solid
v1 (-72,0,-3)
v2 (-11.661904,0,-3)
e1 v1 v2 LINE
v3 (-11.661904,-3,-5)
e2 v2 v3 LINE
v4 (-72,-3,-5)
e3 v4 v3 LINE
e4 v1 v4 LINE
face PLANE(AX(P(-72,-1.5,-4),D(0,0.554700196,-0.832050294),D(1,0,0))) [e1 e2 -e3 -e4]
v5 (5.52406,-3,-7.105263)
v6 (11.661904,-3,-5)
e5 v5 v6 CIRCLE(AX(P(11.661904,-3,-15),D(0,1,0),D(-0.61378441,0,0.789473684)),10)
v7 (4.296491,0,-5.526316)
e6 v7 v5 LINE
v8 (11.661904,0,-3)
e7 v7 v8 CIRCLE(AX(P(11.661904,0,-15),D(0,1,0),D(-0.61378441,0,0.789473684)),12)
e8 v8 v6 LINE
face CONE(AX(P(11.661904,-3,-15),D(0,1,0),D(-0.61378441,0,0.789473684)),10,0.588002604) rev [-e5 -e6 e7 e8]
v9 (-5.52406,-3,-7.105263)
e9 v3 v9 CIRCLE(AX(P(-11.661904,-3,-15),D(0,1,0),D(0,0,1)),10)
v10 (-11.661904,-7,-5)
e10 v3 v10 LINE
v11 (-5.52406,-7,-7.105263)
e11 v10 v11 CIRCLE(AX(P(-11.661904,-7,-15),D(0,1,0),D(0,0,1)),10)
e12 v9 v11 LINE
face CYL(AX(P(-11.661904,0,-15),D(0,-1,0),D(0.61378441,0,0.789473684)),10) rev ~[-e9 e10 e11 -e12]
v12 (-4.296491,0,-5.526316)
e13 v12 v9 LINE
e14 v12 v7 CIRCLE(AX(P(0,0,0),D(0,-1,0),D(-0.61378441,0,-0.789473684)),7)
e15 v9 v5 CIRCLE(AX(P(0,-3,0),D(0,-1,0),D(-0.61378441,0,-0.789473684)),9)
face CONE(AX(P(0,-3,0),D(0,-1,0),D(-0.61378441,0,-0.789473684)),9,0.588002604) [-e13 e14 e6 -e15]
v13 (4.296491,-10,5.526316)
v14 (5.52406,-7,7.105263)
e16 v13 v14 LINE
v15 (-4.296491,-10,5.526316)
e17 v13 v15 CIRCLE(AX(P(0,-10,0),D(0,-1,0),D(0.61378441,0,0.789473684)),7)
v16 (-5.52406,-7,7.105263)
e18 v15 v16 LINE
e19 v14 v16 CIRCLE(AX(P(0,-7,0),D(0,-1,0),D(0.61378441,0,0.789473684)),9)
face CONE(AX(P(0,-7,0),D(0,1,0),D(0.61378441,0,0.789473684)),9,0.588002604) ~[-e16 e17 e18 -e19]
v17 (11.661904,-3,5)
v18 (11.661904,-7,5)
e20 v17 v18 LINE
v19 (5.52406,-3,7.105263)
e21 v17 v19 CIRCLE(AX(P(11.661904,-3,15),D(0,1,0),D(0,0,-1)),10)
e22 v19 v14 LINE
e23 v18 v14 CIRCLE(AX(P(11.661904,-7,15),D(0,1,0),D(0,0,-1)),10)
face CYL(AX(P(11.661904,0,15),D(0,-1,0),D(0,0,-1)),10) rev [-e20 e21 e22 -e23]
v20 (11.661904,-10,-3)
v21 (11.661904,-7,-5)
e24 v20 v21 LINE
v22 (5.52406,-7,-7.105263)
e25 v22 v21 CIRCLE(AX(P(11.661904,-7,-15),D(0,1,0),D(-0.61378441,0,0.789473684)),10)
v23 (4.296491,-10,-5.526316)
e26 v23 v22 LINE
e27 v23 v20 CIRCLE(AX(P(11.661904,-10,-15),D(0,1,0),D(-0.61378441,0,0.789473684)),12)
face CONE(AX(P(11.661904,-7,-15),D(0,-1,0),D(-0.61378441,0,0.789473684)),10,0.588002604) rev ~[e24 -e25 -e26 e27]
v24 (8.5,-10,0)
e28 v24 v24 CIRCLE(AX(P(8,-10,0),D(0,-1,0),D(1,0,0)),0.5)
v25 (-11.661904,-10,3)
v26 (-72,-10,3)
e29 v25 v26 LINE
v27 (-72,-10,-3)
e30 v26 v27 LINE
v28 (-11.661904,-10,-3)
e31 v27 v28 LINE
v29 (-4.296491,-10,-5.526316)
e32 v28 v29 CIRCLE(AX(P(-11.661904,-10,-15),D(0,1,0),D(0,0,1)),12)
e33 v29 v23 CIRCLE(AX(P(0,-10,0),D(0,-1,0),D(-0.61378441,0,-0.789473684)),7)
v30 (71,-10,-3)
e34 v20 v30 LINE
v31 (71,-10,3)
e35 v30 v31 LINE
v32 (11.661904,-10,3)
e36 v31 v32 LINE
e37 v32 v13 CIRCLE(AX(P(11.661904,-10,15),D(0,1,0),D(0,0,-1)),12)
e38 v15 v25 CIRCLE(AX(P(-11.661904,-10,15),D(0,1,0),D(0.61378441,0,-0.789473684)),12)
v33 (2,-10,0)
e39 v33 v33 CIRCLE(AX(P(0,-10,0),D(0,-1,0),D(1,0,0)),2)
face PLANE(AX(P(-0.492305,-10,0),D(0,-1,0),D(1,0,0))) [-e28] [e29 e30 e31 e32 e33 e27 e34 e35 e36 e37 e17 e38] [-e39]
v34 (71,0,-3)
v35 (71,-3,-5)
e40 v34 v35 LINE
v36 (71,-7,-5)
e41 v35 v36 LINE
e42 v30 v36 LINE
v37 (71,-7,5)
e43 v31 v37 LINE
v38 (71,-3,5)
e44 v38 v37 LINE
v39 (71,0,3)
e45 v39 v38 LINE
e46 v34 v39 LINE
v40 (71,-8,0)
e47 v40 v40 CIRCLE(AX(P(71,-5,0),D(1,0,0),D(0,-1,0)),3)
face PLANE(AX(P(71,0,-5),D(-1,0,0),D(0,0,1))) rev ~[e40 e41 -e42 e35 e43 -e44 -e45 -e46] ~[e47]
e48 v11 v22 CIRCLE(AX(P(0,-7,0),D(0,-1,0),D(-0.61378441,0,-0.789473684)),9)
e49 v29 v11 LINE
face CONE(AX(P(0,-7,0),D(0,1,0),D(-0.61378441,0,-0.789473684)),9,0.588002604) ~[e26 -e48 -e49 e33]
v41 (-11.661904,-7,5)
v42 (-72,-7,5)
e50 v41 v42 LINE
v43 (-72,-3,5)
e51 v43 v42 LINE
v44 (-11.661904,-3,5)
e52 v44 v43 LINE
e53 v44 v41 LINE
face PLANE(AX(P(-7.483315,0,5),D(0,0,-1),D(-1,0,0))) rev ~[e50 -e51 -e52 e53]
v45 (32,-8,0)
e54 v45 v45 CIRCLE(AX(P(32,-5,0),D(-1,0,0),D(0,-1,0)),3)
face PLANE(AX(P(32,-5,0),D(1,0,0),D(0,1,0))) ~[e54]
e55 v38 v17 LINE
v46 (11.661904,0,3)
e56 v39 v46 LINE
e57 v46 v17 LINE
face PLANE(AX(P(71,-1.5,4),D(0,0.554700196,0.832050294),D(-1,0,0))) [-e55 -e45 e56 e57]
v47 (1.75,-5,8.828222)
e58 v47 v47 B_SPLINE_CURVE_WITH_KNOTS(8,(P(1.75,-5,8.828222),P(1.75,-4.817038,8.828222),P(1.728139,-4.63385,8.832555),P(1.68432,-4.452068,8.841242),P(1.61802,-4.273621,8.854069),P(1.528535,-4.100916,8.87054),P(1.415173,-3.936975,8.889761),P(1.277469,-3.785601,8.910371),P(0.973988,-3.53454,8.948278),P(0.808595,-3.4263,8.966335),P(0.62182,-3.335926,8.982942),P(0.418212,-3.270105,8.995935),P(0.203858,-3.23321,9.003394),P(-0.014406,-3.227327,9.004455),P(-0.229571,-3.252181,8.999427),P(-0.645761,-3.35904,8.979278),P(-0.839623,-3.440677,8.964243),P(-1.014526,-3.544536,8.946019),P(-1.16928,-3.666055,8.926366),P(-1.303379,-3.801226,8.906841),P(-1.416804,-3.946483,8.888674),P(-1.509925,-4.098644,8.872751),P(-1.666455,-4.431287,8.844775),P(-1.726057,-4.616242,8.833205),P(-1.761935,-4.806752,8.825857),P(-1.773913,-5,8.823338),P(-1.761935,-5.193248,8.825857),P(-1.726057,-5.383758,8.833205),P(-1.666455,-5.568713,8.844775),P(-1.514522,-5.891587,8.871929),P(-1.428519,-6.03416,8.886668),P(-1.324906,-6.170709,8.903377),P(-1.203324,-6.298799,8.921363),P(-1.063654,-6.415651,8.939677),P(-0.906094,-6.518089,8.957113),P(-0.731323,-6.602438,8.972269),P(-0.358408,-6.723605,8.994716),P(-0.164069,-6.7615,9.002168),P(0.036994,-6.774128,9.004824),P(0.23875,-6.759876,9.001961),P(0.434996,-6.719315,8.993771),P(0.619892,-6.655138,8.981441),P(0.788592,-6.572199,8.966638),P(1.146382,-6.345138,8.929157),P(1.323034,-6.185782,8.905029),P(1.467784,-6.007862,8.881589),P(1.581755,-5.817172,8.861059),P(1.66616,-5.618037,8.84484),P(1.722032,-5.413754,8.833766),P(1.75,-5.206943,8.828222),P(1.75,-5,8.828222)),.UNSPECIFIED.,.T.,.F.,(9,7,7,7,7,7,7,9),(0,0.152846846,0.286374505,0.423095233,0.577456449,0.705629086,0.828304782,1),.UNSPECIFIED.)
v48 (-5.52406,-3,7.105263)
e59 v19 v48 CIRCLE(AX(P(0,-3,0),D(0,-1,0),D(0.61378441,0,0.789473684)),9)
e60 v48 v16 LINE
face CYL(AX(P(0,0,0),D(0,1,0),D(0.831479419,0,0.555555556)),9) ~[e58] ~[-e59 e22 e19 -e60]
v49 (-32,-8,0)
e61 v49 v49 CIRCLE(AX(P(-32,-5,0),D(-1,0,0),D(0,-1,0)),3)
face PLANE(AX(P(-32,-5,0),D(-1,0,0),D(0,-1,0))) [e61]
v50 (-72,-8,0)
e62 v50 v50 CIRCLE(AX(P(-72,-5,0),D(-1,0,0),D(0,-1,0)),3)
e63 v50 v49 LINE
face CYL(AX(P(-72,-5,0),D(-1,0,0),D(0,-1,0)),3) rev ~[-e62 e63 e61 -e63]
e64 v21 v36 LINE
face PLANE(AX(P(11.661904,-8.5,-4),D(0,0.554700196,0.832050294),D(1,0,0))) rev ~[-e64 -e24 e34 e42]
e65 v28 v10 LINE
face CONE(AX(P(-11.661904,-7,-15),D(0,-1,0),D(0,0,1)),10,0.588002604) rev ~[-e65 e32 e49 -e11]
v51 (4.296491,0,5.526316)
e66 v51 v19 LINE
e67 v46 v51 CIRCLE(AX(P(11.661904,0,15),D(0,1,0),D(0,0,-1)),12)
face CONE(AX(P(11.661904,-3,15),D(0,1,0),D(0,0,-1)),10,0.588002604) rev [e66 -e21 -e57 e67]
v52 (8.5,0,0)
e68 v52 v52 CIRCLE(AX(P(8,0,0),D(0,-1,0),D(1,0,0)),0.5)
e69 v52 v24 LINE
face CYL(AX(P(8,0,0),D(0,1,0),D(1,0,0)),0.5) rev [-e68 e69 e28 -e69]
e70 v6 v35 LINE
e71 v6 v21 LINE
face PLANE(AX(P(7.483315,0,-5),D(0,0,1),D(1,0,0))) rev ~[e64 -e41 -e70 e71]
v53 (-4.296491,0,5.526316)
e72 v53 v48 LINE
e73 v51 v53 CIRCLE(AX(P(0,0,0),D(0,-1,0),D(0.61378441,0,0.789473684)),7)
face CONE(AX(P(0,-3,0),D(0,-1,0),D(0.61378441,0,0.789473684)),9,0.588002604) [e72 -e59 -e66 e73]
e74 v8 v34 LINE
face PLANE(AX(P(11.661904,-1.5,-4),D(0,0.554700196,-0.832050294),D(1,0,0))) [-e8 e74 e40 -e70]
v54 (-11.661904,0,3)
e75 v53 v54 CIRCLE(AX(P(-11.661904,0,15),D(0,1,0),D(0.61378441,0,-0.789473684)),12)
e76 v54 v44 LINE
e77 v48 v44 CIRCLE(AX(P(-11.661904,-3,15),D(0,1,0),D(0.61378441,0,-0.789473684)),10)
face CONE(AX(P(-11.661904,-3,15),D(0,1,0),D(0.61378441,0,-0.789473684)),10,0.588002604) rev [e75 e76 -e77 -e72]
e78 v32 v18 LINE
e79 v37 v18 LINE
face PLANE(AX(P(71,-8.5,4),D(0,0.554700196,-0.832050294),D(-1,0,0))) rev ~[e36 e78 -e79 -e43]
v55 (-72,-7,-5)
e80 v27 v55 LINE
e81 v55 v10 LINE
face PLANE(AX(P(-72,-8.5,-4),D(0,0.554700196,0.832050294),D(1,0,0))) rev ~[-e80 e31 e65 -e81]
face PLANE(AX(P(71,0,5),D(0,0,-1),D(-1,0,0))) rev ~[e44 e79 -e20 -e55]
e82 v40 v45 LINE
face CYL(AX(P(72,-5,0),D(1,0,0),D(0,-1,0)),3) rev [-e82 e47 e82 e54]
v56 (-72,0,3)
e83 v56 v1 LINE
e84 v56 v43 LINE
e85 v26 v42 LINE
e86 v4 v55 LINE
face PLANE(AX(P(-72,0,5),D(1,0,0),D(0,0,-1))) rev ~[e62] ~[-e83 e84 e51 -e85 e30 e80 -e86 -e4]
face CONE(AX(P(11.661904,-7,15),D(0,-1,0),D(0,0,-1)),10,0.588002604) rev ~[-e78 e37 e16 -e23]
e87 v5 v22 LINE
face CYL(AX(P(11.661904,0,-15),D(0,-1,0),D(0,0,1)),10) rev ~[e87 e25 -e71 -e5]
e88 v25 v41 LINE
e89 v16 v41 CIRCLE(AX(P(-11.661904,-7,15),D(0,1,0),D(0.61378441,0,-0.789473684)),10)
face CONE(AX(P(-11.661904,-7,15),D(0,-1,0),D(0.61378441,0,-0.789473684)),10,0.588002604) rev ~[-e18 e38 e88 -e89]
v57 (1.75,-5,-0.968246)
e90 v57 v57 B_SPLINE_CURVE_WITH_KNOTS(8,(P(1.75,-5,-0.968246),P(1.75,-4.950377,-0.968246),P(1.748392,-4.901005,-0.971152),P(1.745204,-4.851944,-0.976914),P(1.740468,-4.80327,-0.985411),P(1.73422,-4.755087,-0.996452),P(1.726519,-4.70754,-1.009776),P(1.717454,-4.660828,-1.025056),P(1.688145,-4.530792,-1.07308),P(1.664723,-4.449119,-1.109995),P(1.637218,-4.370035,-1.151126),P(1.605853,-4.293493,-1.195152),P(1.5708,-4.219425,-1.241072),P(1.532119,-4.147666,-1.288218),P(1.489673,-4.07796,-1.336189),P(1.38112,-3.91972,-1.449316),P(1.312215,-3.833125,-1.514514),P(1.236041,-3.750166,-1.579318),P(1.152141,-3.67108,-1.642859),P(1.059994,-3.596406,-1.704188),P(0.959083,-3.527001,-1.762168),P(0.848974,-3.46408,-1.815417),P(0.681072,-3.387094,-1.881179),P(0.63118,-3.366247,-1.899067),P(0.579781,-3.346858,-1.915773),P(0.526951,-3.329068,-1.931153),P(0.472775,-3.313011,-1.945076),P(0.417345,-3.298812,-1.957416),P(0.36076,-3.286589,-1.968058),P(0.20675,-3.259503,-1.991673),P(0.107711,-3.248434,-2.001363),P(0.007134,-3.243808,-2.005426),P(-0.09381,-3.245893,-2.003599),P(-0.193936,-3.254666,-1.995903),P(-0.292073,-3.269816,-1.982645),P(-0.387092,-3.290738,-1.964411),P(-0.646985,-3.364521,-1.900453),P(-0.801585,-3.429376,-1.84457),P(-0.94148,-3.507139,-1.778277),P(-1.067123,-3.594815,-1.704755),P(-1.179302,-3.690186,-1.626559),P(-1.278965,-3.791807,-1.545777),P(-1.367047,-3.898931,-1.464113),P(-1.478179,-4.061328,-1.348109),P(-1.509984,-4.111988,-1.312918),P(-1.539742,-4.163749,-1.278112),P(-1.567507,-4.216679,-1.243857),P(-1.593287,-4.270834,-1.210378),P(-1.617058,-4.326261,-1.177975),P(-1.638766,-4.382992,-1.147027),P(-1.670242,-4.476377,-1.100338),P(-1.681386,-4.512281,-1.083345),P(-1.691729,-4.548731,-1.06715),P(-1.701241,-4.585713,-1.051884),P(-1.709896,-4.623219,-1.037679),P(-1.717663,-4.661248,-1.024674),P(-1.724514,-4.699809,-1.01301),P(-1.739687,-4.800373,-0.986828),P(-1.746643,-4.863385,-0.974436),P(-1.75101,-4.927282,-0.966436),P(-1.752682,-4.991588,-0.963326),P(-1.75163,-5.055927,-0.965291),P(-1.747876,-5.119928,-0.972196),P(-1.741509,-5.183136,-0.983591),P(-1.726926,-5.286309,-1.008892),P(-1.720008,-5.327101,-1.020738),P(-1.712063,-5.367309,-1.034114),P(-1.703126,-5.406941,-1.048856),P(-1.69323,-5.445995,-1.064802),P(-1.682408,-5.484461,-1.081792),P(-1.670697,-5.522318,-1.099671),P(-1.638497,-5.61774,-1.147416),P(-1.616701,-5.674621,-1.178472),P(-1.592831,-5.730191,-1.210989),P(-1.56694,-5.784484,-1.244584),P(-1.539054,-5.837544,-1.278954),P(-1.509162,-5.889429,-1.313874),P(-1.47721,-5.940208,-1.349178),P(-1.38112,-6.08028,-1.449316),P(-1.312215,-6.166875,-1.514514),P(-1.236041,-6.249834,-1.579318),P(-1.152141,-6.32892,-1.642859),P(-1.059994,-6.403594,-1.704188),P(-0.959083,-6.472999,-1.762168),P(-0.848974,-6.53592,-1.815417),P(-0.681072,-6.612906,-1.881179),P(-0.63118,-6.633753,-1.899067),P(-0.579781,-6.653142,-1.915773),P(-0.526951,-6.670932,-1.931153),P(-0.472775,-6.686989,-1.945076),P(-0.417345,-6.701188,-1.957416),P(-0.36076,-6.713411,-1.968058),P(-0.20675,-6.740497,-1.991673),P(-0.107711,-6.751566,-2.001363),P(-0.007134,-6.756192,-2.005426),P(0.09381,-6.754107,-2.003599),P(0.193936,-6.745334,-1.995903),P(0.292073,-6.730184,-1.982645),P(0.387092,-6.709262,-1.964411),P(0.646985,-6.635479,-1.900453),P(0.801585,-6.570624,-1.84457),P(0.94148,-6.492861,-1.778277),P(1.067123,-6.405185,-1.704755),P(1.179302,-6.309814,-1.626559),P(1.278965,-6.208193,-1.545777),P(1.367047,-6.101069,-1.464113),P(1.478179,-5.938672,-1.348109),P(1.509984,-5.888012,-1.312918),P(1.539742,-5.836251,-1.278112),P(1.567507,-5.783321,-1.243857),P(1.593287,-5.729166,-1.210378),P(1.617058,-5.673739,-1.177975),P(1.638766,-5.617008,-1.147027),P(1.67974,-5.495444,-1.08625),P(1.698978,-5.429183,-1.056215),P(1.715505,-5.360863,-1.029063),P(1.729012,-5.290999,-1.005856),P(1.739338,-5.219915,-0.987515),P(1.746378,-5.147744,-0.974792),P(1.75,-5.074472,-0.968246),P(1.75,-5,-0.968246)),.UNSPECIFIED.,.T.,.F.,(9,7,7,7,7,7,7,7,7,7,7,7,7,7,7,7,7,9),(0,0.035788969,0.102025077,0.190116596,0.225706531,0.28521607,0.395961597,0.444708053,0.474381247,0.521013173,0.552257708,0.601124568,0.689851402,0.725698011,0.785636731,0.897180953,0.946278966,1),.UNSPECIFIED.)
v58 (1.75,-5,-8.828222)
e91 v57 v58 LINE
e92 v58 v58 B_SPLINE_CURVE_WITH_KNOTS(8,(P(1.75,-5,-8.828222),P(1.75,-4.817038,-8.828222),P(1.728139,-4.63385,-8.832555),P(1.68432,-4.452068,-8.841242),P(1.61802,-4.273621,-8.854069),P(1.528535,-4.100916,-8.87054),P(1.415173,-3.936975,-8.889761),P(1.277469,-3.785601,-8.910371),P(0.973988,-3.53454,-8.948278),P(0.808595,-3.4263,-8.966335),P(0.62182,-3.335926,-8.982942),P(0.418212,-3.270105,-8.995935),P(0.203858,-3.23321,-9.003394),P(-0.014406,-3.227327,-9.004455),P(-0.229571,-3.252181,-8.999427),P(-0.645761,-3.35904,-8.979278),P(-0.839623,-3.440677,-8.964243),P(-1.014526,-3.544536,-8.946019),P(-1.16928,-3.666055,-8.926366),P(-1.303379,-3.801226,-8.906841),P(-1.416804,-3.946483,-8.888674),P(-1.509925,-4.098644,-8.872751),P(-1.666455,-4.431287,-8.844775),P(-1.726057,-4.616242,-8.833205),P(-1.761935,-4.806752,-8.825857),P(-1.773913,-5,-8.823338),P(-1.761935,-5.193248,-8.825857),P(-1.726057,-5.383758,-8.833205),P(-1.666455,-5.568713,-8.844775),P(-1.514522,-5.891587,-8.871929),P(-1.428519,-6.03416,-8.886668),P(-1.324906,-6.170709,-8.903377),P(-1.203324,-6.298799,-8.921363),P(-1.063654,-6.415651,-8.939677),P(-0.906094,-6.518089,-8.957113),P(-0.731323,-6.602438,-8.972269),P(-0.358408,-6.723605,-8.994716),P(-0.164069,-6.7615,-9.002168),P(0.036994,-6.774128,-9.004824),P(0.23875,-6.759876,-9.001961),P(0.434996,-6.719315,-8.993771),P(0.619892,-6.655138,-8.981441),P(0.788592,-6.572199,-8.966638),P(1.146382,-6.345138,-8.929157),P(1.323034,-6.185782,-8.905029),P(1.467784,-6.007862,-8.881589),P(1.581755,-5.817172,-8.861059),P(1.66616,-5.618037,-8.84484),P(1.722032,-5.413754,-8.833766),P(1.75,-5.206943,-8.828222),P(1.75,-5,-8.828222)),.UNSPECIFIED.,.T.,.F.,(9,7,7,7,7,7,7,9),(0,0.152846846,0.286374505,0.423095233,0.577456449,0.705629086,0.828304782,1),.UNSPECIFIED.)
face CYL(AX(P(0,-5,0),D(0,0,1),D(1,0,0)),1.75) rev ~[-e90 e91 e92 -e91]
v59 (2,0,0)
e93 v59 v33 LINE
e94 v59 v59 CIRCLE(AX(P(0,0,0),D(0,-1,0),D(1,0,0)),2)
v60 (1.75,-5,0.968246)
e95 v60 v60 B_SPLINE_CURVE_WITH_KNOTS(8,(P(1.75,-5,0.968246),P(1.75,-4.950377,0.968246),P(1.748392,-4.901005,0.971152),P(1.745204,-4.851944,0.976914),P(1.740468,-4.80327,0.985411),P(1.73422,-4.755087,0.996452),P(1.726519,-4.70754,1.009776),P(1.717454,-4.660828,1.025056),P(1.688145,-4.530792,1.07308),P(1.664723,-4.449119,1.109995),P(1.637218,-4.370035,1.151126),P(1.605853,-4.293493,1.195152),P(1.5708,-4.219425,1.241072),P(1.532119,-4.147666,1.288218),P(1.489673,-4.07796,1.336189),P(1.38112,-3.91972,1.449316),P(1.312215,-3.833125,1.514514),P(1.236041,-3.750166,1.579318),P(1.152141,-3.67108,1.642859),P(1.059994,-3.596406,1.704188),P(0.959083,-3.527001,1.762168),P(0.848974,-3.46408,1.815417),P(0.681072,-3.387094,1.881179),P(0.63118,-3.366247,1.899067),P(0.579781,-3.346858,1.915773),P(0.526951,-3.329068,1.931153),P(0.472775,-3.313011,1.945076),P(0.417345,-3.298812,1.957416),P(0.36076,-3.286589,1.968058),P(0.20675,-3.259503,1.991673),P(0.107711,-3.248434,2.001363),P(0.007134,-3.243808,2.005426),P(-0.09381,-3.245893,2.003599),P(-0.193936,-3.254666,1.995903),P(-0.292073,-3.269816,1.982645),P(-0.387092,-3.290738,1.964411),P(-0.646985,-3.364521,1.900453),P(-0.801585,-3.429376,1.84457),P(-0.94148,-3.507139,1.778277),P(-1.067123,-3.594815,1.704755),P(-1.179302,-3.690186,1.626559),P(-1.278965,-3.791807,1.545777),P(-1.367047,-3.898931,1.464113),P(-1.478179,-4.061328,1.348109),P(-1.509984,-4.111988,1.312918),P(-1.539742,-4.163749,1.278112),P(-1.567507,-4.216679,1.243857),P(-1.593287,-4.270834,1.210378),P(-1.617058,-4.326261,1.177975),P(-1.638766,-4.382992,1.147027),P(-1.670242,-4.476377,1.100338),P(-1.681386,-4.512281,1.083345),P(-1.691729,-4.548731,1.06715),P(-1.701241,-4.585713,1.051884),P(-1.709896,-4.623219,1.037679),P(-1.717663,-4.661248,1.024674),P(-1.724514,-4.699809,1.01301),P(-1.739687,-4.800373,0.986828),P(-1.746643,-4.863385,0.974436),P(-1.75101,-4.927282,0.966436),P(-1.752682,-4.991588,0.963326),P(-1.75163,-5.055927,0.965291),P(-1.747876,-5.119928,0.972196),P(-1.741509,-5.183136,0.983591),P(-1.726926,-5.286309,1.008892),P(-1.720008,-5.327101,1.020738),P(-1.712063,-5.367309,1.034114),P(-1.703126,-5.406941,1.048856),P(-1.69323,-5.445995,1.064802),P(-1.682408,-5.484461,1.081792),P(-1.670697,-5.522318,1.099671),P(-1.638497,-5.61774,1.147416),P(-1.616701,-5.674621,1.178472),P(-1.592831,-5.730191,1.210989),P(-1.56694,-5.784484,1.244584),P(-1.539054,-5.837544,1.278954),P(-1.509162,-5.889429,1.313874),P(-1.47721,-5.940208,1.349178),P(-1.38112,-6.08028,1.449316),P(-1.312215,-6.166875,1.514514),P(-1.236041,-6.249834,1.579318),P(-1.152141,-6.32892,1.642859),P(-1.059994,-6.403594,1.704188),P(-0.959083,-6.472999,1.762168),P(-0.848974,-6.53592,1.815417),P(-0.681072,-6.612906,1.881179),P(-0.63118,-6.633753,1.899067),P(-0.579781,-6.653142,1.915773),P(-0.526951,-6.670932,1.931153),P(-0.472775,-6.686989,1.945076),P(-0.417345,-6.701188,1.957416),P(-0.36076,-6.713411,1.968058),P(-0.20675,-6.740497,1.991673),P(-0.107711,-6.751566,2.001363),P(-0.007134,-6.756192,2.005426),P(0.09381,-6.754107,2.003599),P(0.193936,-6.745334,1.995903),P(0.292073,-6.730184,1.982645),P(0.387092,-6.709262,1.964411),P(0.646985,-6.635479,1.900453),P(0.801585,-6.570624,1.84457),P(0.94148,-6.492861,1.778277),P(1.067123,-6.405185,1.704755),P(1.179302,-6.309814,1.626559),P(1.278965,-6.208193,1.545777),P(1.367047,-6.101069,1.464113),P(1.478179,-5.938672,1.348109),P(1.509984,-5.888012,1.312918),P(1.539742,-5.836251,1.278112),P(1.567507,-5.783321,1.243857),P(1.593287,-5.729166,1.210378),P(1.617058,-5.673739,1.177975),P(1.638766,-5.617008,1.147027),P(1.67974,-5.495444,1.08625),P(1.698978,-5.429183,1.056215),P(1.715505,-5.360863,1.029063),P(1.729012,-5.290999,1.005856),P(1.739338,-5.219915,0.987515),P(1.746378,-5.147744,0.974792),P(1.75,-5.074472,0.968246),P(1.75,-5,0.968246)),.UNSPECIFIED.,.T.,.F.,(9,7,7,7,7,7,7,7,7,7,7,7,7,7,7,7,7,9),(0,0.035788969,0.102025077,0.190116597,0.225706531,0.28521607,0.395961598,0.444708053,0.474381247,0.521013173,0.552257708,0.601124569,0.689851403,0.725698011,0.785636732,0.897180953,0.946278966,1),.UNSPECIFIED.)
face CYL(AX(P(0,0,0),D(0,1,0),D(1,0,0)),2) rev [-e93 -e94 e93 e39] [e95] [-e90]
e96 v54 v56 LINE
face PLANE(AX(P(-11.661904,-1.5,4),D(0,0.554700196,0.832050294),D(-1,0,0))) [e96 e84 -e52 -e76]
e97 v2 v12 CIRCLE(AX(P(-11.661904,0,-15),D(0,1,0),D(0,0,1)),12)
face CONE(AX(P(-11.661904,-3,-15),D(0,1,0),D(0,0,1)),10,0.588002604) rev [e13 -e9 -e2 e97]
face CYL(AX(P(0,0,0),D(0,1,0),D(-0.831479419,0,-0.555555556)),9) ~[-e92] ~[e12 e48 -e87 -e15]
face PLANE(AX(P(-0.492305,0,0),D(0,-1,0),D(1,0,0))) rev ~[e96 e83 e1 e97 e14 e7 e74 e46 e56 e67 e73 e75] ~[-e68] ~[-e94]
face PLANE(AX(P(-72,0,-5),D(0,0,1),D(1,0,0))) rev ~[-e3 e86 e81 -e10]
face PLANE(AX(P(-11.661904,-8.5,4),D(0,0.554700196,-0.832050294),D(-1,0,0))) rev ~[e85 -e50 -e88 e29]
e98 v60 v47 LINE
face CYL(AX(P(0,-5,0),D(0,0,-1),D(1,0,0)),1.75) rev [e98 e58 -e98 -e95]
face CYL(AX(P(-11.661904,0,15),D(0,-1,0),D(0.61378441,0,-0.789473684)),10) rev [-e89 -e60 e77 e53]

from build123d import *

# Parameters (mm, degrees)
F0_R          = 2
F0_R_2        = 0.5
F1_DEPTH      = 10
F2_R          = 3
F3_DEPTH      = 40
F4_R          = 1.75
F5_DEPTH      = 9.001
F5_DEPTH_BACK = 9.001
F6_R          = 10
F7_SIZE2      = 3
F7_SIZE       = 2
F7_2_SIZE2    = 3
F7_2_SIZE     = 2


# Not quite as in the source:
# - a pattern or mirror of a feature is missing from the dataset's text; its kind, count and spacing are read off the source's solid


with BuildPart() as f1:
    # F0 (on Front) → F1 (new body)
    with BuildSketch(Plane.XZ):
        with BuildLine():
            Line((71, 5), (7.4833147735, 5))
            ThreePointArc((7.4833147735, 5), (0, 9), (-7.4833147735, 5))
            Line((-7.4833147735, 5), (-72, 5))
            Line((-72, 5), (-72, -5))
            Line((-72, -5), (-7.4833147735, -5))
            ThreePointArc((-7.4833147735, -5), (0, -9), (7.4833147735, -5))
            Line((7.4833147735, -5), (71, -5))
            Line((71, -5), (71, 5))
        make_face()
        Circle(F0_R, mode=Mode.SUBTRACT)
        with Locations((8, 0)):
            Circle(F0_R_2, mode=Mode.SUBTRACT)
    extrude(amount=F1_DEPTH)

    # F2 (on face) → F3 (cut)
    with BuildSketch(Plane(origin=(-72, 0, 0), x_dir=(0, -1, 0), z_dir=(-1, 0, 0))):
        with Locations((5, 0)):
            Circle(F2_R)
    f3 = extrude(amount=-F3_DEPTH, mode=Mode.SUBTRACT)

    # F3_copies: F3 across plane
    add(f3.mirror(Plane(origin=(0, 0, 0), x_dir=(0, 0, 1), z_dir=(1, 0, 0))), mode=Mode.SUBTRACT)

    # F4 (on Top) → F5 (cut, two sides)
    with BuildSketch(Plane.XY) as f5_sk:
        with Locations((0, -5)):
            Circle(F4_R)
    extrude(amount=-F5_DEPTH, mode=Mode.SUBTRACT)
    extrude(f5_sk.sketch, amount=F5_DEPTH_BACK, mode=Mode.SUBTRACT)

    # F6
    f6_edges = [f1.edges().sort_by_distance(p)[0] for p in [
        (-7.483315, -5, 5),
        (7.483315, -5, 5),
        (7.483315, -5, -5),
        (-7.483315, -5, -5),
    ]]
    fillet(f6_edges, radius=F6_R)

    # F7
    f7_edges = [f1.edges().sort_by_distance(p)[0] for p in [
        (-41.830952, -10, 5),
        (-41.830952, -10, -5),
    ]]
    f7_side = f1.faces().sort_by_distance((41.330952, -10, -3.558716))[0]
    chamfer(f7_edges, length=F7_SIZE, length2=F7_SIZE2, reference=f7_side)

    # F7#2
    f7_2_edges = [f1.edges().sort_by_distance(p)[0] for p in [
        (-41.830952, 0, 5),
        (-41.830952, 0, -5),
    ]]
    f7_2_side = f1.faces().sort_by_distance((41.330952, 0, -3.558716))[0]
    chamfer(f7_2_edges, length=F7_2_SIZE, length2=F7_2_SIZE2, reference=f7_2_side)


solid = f1.part
